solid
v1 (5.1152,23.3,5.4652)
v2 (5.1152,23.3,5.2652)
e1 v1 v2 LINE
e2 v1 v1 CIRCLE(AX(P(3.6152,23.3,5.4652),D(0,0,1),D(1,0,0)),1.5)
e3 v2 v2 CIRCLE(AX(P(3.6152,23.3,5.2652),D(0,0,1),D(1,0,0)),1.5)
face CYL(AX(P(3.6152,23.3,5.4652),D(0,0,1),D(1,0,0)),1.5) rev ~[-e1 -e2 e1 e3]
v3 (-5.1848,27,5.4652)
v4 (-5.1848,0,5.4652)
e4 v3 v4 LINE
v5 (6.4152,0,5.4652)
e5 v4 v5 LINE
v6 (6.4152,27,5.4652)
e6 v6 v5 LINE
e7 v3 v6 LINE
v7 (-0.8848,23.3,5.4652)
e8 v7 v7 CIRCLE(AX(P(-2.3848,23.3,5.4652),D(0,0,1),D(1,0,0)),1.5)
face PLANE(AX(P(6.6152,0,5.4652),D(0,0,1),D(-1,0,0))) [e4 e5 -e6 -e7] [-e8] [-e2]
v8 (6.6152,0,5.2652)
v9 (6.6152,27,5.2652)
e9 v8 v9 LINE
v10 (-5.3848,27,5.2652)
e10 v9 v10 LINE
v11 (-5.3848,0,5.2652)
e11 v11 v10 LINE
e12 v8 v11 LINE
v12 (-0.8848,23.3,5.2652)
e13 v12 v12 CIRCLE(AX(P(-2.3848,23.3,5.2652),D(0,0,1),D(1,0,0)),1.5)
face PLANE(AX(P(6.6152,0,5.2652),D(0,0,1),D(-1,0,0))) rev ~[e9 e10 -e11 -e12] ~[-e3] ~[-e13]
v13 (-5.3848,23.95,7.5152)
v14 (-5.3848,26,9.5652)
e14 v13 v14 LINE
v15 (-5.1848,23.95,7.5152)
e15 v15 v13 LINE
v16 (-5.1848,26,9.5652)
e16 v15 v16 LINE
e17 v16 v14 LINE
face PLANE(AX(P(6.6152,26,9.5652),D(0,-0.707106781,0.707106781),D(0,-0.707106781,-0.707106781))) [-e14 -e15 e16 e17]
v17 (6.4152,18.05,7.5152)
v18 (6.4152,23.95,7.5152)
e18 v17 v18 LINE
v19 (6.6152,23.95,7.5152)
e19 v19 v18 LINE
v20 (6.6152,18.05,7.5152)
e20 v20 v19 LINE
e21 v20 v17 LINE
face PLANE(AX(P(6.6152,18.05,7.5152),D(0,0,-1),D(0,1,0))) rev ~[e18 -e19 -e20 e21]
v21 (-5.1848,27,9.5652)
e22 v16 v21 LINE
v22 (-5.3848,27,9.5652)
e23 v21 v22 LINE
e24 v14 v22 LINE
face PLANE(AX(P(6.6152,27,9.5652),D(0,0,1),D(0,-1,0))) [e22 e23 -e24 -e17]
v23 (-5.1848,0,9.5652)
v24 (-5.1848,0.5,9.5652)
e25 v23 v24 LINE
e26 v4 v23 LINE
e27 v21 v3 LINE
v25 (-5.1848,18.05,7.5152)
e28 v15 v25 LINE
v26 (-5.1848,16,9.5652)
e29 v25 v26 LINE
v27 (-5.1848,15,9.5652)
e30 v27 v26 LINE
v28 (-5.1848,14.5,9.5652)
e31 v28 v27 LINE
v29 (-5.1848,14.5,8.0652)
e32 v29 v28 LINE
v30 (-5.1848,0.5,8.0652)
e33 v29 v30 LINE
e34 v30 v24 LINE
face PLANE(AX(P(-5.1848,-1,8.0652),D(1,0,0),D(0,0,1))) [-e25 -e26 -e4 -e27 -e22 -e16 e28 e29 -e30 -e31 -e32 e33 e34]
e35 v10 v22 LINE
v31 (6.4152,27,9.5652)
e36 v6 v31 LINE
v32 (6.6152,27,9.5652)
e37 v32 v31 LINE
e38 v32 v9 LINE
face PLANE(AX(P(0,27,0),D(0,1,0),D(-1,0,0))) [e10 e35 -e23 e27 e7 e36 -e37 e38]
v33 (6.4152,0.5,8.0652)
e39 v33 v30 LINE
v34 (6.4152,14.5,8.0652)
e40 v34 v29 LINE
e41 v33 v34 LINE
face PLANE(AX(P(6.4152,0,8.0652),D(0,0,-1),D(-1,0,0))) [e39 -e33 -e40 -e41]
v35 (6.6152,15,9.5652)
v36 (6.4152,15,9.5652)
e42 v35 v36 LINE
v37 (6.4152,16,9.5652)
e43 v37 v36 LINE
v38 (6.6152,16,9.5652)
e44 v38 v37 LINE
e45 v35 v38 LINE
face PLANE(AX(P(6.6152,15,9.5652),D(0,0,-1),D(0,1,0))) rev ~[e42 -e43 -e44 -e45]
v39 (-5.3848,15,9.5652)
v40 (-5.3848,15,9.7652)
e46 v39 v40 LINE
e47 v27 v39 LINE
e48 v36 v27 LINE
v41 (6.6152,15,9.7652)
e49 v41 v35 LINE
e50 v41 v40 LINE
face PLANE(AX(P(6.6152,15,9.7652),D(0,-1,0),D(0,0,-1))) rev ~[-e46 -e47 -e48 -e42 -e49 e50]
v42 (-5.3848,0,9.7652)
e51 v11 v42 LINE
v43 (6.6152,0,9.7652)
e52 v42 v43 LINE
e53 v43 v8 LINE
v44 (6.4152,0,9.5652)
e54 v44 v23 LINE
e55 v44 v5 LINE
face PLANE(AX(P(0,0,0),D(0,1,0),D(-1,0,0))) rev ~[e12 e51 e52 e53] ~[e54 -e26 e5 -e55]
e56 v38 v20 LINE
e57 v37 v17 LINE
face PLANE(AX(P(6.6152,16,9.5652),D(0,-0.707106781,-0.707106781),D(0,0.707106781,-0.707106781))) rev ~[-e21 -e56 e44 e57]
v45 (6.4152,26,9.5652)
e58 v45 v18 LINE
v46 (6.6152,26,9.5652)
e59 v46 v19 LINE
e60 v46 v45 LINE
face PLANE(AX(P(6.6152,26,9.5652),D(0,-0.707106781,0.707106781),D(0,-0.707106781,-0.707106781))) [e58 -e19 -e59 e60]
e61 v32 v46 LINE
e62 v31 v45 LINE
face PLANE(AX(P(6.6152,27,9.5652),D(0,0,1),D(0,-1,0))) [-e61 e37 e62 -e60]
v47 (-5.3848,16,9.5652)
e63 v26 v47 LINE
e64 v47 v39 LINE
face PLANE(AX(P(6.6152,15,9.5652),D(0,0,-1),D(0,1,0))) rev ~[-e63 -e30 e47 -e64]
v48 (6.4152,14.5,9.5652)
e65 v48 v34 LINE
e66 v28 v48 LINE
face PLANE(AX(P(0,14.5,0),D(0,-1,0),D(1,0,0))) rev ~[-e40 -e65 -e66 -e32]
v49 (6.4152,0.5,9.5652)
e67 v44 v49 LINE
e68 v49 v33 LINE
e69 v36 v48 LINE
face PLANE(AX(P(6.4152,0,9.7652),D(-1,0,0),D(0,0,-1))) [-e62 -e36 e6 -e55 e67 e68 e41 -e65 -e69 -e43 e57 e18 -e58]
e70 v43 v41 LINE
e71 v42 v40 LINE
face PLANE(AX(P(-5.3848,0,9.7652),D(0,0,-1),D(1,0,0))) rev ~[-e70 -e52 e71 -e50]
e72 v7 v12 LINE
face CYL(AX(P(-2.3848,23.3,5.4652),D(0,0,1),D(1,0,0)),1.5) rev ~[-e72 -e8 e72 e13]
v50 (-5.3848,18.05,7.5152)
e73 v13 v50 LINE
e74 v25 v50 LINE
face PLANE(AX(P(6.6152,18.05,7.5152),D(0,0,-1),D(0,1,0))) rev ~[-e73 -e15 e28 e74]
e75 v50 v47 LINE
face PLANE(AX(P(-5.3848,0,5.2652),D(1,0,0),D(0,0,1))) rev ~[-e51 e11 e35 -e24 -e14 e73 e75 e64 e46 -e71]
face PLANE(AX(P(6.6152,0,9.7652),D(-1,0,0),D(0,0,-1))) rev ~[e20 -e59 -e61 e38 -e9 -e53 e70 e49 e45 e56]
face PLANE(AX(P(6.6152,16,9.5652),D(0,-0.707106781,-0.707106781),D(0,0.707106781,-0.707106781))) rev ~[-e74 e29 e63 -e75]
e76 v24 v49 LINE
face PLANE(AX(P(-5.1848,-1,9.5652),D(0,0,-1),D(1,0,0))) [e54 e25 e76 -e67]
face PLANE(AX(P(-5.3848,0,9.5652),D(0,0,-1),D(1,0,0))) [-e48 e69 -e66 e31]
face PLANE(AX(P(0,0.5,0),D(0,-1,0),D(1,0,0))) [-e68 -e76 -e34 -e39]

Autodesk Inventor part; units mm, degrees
ref_plane "YZ Plane" through (0, 0, 0) normal (1, 0, 0) x (0, 1, 0)
ref_plane "XZ Plane" through (0, 0, 0) normal (0, 1, 0) x (-1, 0, 0)
ref_plane "XY Plane" through (0, 0, 0) normal (0, 0, 1) x (1, 0, 0)
sketch "Sketch1" plane through (0, 0, 0) normal (0, 1, 0) x (-1, 0, 0)
  line L0 (5.3848, 9.7652) -> (-6.6152, 9.7652)
  line L1 (-6.6152, 9.7652) -> (-6.6152, 5.2652)
  line L2 (-6.6152, 5.2652) -> (5.3848, 5.2652)
  line L3 (5.3848, 5.2652) -> (5.3848, 9.7652)
  point P0 (0, 0)
  dimension "d0" = 12
  dimension "d1" = 4.5
extrude "Extrusion1" add sketch "Sketch1" along normal blind 27
shell "Shell1" thickness 0.2 removed faces 2 at (2.6152, 27, 8.2652) at (2.6152, 0, 8.2652)
sketch "Sketch2" plane through (6.6152, 0, 9.7652) normal (1, 0, 0) x (0, 0, -1)
  line L0 (0, 0) -> (0, 27) projected
  line L1 (0, 27) -> (0, 15)
  line L2 (0, 15) -> (0.2, 15)
  line L3 (0.2, 15) -> (0.2, 16)
  line L4 (0, 27) -> (0.2, 27)
  line L5 (0.2, 27) -> (0.2, 26)
  line L6 (0.2, 27) -> (4.3, 27) projected
  line L7 (0.2, 26) -> (2.25, 23.95)
  line L8 (0.2, 16) -> (2.25, 18.05)
  line L9 (2.25, 18.05) -> (2.25, 23.95)
  line L10 (0, 0) -> (0, 27) projected
  point P0 (9.7652, 0)
  dimension "d5" = 12
  dimension "d6" = 0.2
  dimension "d7" = 1
  dimension "d9" = 1
  dimension "d12" = 2.05
  dimension "d15" = 2.05
  dimension "d16" = 5.9
  dimension "d17" = 2.05
extrude "Extrusion2" cut sketch "Sketch2" against normal up to next
sketch "Sketch3" plane through (-5.1848, 0, 5.4652) normal (0, 0, 1) x (1, 0, 0)
  circle A0 centre (2.8, 23.3) radius 1.5
  circle A1 centre (8.8, 23.3) radius 1.5
  line L0 (0, 27) -> (11.6, 27) projected
  line L1 (-0.2, 23.95) -> (-0.2, 26) projected
  line L2 (11.8, 26) -> (11.8, 23.95) projected
  point P0 (5.1848, 0)
  dimension "d20" = 3
  dimension "d21" = 3.7
  dimension "d22" = 3
  dimension "d23" = 3
extrude "Extrusion3" cut sketch "Sketch3" against normal up to next
sketch "Sketch4" plane through (0, 0, 0) normal (0, -1, 0) x (1, 0, 0)
  line L0 (-5.1848, 9.5652) -> (-5.3848, 9.5652) projected
  line L1 (-5.1848, 9.5652) -> (6.4152, 9.5652)
  line L2 (6.4152, 9.5652) -> (6.4152, 8.0652)
  line L3 (6.4152, 8.0652) -> (-5.1848, 8.0652)
  line L4 (-5.1848, 8.0652) -> (-5.1848, 9.5652)
  point P0 (0, 0)
  dimension "d26" = 11.6
  dimension "d27" = 1.5
extrude "Extrusion4" add sketch "Sketch4" along normal blind 1 and the other way blind 14.5
move faces "Move1" translate (0, 1.5, 0) faces at (-1.3181, -1, 9.0652)
properties part number "USB_Contact"
